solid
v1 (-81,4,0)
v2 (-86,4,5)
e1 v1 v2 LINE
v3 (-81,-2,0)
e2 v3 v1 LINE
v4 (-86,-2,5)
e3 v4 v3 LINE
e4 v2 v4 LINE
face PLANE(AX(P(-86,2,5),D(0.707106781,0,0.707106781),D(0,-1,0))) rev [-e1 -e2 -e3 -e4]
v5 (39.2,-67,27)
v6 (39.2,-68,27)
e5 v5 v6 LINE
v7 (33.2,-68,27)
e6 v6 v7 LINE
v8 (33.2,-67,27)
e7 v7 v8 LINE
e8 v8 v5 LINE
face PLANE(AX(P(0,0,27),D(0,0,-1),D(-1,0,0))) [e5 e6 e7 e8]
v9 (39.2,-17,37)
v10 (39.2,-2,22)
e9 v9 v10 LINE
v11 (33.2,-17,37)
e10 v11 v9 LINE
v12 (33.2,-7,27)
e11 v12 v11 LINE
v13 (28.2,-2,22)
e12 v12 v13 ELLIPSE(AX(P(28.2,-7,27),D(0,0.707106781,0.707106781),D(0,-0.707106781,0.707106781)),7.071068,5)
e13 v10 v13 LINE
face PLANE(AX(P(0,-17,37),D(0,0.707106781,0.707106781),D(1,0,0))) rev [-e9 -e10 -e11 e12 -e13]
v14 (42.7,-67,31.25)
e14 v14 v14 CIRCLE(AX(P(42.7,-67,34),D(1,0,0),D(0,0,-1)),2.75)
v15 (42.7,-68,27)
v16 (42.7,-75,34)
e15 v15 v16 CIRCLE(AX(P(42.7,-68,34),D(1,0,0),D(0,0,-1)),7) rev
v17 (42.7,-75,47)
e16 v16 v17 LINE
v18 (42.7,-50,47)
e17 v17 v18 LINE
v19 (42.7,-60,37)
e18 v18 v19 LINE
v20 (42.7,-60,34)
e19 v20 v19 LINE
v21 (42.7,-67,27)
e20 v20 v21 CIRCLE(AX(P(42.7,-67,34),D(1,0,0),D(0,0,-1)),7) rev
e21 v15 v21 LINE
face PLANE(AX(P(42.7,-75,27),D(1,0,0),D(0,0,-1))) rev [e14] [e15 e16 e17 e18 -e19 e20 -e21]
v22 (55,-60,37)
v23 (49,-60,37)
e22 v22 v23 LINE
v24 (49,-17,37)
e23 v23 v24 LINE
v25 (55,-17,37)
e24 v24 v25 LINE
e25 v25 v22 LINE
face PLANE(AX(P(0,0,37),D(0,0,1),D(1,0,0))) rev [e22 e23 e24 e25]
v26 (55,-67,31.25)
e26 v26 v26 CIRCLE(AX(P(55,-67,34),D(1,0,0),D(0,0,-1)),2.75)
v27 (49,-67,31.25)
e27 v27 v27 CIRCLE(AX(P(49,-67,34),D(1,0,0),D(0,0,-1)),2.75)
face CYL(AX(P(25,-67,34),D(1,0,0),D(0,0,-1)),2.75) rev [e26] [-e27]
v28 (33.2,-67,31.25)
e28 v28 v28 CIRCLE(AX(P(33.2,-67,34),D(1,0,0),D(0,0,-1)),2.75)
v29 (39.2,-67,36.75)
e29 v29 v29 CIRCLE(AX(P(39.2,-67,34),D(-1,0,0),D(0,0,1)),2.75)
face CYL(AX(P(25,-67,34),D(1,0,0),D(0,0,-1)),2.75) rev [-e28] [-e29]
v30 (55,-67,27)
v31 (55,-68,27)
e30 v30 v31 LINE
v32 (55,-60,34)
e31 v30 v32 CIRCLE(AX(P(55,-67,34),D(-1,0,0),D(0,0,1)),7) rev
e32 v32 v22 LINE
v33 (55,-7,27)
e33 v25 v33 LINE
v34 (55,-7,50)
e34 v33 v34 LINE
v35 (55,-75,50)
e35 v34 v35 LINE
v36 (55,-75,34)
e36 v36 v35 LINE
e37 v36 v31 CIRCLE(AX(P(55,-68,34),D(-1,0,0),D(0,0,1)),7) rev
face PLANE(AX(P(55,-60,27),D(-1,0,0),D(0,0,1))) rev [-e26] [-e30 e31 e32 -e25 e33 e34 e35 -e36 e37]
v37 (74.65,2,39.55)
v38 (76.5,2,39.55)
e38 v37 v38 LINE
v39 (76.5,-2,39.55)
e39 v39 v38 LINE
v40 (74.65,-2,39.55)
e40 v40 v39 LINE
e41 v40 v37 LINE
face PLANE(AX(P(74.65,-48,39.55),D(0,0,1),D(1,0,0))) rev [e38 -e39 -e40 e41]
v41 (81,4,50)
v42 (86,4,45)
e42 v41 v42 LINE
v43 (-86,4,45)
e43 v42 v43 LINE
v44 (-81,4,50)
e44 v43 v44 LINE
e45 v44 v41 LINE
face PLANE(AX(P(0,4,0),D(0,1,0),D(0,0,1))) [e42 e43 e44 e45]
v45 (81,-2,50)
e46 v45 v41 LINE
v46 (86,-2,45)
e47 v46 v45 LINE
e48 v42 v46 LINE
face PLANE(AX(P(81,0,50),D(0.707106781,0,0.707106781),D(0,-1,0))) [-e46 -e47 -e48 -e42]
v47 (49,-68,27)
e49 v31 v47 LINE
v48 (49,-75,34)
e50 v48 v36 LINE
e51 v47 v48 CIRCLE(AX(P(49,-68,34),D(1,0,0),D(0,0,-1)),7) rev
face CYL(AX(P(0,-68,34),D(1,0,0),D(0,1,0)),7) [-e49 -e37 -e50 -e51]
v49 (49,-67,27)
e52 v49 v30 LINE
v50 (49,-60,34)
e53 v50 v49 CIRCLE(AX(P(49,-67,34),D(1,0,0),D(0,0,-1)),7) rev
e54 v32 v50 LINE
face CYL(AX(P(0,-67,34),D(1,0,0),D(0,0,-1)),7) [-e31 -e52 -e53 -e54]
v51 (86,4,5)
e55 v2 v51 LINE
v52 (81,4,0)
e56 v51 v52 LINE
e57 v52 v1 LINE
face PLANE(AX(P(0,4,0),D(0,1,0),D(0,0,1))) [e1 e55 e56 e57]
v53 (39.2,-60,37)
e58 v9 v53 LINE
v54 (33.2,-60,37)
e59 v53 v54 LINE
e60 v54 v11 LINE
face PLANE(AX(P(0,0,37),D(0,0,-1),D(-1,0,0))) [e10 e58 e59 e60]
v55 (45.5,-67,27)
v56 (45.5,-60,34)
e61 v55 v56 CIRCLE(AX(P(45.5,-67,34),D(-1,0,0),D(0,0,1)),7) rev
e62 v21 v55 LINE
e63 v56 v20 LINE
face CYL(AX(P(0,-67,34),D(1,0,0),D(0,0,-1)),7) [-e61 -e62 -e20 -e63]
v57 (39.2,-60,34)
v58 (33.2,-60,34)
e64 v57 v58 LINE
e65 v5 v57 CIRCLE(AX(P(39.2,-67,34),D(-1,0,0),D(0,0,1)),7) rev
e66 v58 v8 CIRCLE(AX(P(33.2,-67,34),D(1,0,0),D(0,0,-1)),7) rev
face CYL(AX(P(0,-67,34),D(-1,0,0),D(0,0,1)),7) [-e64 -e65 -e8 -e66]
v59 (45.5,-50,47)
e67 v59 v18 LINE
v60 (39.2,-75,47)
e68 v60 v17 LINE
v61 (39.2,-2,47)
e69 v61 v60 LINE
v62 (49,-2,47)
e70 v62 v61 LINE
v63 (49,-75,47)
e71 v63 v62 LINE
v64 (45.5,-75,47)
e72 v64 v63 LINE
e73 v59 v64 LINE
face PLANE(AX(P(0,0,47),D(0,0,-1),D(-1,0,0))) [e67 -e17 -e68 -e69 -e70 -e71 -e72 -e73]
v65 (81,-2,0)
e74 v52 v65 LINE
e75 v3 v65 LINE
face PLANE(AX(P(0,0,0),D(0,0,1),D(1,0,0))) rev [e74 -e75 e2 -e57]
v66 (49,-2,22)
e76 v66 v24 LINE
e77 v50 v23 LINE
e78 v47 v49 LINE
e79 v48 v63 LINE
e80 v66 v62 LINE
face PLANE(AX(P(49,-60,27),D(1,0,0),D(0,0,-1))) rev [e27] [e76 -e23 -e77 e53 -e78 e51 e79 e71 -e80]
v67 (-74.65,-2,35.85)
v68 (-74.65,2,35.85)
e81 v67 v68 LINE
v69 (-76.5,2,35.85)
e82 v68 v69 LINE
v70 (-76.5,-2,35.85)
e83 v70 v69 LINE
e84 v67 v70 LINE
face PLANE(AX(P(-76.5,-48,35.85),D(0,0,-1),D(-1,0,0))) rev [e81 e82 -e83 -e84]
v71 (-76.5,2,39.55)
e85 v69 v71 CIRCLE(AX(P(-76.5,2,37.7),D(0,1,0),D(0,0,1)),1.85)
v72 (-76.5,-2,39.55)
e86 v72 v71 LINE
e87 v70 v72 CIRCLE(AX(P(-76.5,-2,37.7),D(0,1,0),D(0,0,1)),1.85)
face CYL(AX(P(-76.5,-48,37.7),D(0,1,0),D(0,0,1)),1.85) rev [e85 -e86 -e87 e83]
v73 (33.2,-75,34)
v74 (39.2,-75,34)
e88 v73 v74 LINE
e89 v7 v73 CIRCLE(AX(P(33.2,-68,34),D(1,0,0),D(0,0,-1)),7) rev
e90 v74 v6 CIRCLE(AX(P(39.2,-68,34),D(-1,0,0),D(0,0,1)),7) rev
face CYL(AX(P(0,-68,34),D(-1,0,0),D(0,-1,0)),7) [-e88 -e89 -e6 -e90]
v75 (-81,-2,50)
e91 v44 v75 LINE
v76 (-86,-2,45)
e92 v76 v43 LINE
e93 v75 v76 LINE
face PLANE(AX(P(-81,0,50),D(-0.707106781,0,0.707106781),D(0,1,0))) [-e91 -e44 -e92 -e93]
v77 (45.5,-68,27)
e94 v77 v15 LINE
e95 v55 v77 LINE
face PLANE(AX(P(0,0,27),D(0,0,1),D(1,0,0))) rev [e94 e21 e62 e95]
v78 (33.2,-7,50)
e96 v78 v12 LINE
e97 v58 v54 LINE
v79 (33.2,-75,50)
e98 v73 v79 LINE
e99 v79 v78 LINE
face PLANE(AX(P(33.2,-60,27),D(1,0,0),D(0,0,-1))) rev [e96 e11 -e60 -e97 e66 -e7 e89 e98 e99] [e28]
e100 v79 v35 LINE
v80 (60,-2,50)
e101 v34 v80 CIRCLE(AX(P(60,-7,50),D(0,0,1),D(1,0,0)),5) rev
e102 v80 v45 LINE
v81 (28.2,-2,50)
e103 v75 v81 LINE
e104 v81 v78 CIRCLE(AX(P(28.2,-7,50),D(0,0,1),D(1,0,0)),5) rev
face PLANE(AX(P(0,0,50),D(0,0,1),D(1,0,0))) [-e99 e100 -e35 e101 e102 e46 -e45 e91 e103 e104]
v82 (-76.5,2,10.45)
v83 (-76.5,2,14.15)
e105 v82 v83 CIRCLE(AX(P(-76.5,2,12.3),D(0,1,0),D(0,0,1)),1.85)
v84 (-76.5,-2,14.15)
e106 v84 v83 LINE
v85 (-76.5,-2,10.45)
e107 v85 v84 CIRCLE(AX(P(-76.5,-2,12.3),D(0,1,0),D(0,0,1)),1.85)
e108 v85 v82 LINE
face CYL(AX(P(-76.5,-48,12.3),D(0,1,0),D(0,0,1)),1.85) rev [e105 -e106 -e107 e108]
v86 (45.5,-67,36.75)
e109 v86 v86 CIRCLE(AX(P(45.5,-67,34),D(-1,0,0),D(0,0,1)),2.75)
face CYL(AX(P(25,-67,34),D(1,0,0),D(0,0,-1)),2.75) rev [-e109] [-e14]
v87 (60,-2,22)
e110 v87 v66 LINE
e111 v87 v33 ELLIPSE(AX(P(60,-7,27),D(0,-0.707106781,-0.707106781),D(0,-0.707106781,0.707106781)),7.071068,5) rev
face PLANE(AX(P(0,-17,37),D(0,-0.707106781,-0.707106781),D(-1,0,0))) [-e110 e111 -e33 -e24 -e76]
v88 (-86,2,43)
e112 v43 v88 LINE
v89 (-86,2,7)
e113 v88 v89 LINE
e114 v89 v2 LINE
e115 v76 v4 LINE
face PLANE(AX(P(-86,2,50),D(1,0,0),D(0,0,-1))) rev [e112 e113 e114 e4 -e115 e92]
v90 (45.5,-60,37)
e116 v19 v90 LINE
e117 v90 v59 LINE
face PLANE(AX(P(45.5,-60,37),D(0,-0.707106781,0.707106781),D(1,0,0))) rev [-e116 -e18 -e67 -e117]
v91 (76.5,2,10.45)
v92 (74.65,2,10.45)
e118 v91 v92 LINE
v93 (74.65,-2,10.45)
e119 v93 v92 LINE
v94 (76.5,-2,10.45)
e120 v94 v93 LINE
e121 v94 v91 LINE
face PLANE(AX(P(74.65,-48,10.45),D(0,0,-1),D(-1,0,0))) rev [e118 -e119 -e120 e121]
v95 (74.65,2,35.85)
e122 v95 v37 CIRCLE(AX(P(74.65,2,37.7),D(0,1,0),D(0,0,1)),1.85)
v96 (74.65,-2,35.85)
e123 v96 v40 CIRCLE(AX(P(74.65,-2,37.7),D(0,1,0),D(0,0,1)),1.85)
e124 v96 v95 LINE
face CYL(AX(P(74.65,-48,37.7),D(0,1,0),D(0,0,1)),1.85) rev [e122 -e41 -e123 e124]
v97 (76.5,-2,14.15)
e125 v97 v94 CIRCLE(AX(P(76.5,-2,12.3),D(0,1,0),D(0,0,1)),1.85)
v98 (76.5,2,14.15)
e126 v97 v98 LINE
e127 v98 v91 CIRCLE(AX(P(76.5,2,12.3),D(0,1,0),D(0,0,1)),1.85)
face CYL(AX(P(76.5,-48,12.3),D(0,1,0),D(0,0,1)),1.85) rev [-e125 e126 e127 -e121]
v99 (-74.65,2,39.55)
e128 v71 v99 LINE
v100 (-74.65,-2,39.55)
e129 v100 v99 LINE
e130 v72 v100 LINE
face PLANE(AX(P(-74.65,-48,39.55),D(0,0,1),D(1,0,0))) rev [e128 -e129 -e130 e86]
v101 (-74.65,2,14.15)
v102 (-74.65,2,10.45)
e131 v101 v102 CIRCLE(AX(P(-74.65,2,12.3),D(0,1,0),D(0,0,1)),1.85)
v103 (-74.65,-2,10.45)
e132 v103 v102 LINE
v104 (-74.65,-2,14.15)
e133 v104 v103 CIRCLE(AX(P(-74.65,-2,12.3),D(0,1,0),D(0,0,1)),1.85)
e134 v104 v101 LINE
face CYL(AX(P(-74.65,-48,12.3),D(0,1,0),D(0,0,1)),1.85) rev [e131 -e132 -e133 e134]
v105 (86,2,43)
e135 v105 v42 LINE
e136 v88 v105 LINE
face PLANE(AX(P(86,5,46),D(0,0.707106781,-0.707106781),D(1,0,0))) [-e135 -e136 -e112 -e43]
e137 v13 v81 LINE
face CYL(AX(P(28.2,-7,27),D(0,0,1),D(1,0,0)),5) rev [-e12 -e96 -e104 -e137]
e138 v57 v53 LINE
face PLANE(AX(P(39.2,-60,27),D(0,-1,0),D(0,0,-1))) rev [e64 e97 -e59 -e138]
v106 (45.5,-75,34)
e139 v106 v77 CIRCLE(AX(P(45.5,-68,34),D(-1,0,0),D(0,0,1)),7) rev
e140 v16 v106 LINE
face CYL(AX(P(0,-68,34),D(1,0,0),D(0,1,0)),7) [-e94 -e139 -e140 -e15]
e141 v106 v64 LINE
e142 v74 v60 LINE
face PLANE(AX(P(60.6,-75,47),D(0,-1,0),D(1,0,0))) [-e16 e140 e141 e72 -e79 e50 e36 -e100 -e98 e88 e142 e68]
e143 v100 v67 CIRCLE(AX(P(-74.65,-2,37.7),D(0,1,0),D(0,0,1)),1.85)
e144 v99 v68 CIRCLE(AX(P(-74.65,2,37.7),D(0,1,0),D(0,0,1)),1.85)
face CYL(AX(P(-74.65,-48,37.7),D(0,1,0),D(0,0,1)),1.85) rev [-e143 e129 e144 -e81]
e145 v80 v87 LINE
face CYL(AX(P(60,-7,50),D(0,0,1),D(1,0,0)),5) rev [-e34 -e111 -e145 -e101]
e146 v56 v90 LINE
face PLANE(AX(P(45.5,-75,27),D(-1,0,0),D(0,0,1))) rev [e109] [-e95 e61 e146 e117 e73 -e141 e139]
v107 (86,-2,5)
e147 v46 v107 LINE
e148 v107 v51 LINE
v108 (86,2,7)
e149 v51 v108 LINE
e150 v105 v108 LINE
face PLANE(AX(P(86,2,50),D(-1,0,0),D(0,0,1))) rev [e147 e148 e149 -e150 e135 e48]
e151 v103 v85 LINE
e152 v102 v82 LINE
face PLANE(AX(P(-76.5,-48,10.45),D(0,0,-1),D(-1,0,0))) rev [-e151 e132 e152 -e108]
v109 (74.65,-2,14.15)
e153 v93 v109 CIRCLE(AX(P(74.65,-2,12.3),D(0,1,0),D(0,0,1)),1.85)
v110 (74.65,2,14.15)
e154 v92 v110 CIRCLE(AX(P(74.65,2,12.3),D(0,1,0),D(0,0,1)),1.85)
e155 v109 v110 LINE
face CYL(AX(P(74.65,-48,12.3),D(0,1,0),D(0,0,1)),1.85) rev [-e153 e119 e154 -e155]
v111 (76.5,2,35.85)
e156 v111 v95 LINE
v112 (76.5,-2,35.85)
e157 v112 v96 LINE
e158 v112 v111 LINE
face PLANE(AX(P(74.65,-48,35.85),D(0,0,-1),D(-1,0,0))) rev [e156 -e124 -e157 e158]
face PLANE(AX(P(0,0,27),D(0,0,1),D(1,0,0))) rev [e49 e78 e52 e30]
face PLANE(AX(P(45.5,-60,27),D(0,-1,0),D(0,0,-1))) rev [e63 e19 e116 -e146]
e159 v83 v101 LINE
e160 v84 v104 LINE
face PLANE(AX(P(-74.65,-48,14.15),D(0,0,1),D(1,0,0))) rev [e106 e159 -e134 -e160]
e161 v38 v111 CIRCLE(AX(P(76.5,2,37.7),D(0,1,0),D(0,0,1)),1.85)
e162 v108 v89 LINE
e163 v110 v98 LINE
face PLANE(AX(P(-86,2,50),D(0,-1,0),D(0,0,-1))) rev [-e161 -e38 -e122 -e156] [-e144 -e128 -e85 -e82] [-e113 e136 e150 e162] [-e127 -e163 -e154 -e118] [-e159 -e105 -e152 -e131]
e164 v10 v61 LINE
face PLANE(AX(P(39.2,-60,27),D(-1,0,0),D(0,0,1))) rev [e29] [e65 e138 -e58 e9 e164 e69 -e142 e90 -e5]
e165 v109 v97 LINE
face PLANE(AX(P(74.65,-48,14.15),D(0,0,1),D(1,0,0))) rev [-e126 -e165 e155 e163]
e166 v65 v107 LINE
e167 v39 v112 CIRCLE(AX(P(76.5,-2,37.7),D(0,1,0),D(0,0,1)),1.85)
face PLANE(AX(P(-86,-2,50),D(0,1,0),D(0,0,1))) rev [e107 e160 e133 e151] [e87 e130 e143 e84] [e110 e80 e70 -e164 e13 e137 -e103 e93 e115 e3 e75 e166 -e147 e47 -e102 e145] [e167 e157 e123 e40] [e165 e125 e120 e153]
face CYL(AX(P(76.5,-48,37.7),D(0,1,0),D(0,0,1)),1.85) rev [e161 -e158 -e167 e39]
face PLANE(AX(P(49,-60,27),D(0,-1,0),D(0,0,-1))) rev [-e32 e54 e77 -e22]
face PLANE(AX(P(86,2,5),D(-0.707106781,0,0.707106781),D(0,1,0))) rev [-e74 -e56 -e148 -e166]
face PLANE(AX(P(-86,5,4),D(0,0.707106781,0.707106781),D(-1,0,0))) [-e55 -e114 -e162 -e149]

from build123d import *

# Parameters (mm, degrees)
SKETCH1_W           = 172
SKETCH1_H           = 4
BOSS_EXTRUDE1_DEPTH = 50
CUT_EXTRUDE1_DEPTH  = 50
SKETCH3_W           = 35
SKETCH3_H           = 73
BOSS_EXTRUDE2_DEPTH = 3
SKETCH4_W           = 2.8
SKETCH4_H           = 15
SKETCH4_W_2         = 6
BOSS_EXTRUDE3_DEPTH = 20
FILLET1_R           = 7
SKETCH5_R           = 2.75
CUT_EXTRUDE2_DEPTH  = 30
SKETCH6_W           = 5.6
SKETCH6_H           = 73
SKETCH6_W_2         = 7.6
CUT_EXTRUDE3_DEPTH  = 20
SKETCH7_W           = 6
SKETCH7_H           = 58
BOSS_EXTRUDE4_DEPTH = 10
CHAMFER1_SIZE       = 10
CHAMFER2_SIZE       = 15
FILLET2_R           = 5
SKETCH8_W           = 172
SKETCH8_H           = 4
BOSS_EXTRUDE5_DEPTH = 2
CHAMFER3_SIZE       = 3
CHAMFER4_SIZE       = 5


with BuildPart() as part:
    # Sketch1 → Boss-Extrude1 (new body)
    with BuildSketch(Plane.XY):
        Rectangle(SKETCH1_W, SKETCH1_H)
    extrude(amount=BOSS_EXTRUDE1_DEPTH)

    # Sketch2 → Cut-Extrude1 (cut)
    with BuildSketch(Plane(origin=(0, 2, 0), x_dir=(1, 0, 0), z_dir=(0, 1, 0))):
        with BuildLine():
            Line((-76.5, -10.45), (-74.65, -10.45))
            ThreePointArc((-74.65, -10.45), (-72.8, -12.3), (-74.65, -14.15))
            Line((-74.65, -14.15), (-76.5, -14.15))
            ThreePointArc((-76.5, -14.15), (-78.35, -12.3), (-76.5, -10.45))
        make_face()
        with BuildLine():
            Line((74.65, -10.45), (76.5, -10.45))
            ThreePointArc((76.5, -10.45), (78.35, -12.3), (76.5, -14.15))
            Line((76.5, -14.15), (74.65, -14.15))
            ThreePointArc((74.65, -14.15), (72.8, -12.3), (74.65, -10.45))
        make_face()
        with BuildLine():
            Line((-76.5, -35.85), (-74.65, -35.85))
            ThreePointArc((-74.65, -35.85), (-72.8, -37.7), (-74.65, -39.55))
            Line((-74.65, -39.55), (-76.5, -39.55))
            ThreePointArc((-76.5, -39.55), (-78.35, -37.7), (-76.5, -35.85))
        make_face()
        with BuildLine():
            Line((74.65, -35.85), (76.5, -35.85))
            ThreePointArc((76.5, -35.85), (78.35, -37.7), (76.5, -39.55))
            Line((76.5, -39.55), (74.65, -39.55))
            ThreePointArc((74.65, -39.55), (72.8, -37.7), (74.65, -35.85))
        make_face()
    extrude(amount=-CUT_EXTRUDE1_DEPTH, mode=Mode.SUBTRACT)

    # Sketch3 → Boss-Extrude2 (add)
    with BuildSketch(Plane.XY.offset(50)):
        with Locations((43.1, -38.5)):
            Rectangle(SKETCH3_W, SKETCH3_H)
    extrude(amount=-BOSS_EXTRUDE2_DEPTH)

    # Sketch4 → Boss-Extrude3 (add)
    with BuildSketch(Plane(origin=(0, 0, 47), x_dir=(-1, 0, 0), z_dir=(0, 0, -1))):
        with Locations((-44.1, -67.5)):
            Rectangle(SKETCH4_W, SKETCH4_H)
        with Locations((-36.2, -67.5)):
            Rectangle(SKETCH4_W_2, SKETCH4_H)
        with Locations((-52, -67.5)):
            Rectangle(SKETCH4_W_2, SKETCH4_H)
    extrude(amount=BOSS_EXTRUDE3_DEPTH)

    # Fillet1
    fillet1_edges = [part.edges().sort_by_distance(p)[0] for p in [
        (44.1, -75, 27),
        (44.1, -60, 27),
        (36.2, -75, 27),
        (36.2, -60, 27),
        (52, -60, 27),
        (52, -75, 27),
    ]]
    fillet(fillet1_edges, radius=FILLET1_R)

    # Sketch5 → Cut-Extrude2 (cut)
    with BuildSketch(Plane(origin=(55, 0, 0), x_dir=(0, 0, -1), z_dir=(1, 0, 0))):
        with Locations((-34, -67)):
            Circle(SKETCH5_R)
    extrude(amount=-CUT_EXTRUDE2_DEPTH, mode=Mode.SUBTRACT)

    # Sketch6 → Cut-Extrude3 (cut)
    with BuildSketch(Plane(origin=(0, 0, 47), x_dir=(-1, 0, 0), z_dir=(0, 0, -1))):
        with Locations((-57.8, -38.5)):
            Rectangle(SKETCH6_W, SKETCH6_H)
        with Locations((-29.4, -38.5)):
            Rectangle(SKETCH6_W_2, SKETCH6_H)
    extrude(amount=-CUT_EXTRUDE3_DEPTH, mode=Mode.SUBTRACT)

    # Sketch7 → Boss-Extrude4 (add)
    with BuildSketch(Plane(origin=(0, 0, 47), x_dir=(-1, 0, 0), z_dir=(0, 0, -1))):
        with Locations((-52, -31)):
            Rectangle(SKETCH7_W, SKETCH7_H)
        with Locations((-36.2, -31)):
            Rectangle(SKETCH7_W, SKETCH7_H)
    extrude(amount=BOSS_EXTRUDE4_DEPTH)

    # Chamfer1
    chamfer1_edges = [part.edges().sort_by_distance(p)[0] for p in [
        (44.1, -60, 47),
    ]]
    chamfer(chamfer1_edges, length=CHAMFER1_SIZE)

    # Chamfer2
    chamfer2_edges = [part.edges().sort_by_distance(p)[0] for p in [
        (52, -2, 37),
        (36.2, -2, 37),
    ]]
    chamfer(chamfer2_edges, length=CHAMFER2_SIZE)

    # Fillet2
    fillet2_edges = [part.edges().sort_by_distance(p)[0] for p in [
        (55, -2, 36),
        (33.2, -2, 36),
    ]]
    fillet(fillet2_edges, radius=FILLET2_R)

    # Sketch8 → Boss-Extrude5 (add)
    with BuildSketch(Plane(origin=(0, 2, 0), x_dir=(1, 0, 0), z_dir=(0, 1, 0))):
        with Locations((0, -2)):
            Rectangle(SKETCH8_W, SKETCH8_H)
        with Locations((0, -48)):
            Rectangle(SKETCH8_W, SKETCH8_H)
    extrude(amount=BOSS_EXTRUDE5_DEPTH)

    # Chamfer3
    # the kernel refuses this chamfer: 3 mm, written as the material it adds along each edge
    with BuildSketch(Plane(origin=(-86, 2, 46), x_dir=(0, -0.027495876610586334, -0.9996219169112968), z_dir=(1, 0, 0))) as chamfer3_piece_1_section:
        Polygon((CHAMFER3_SIZE * 0.999621916911, CHAMFER3_SIZE * 0.0274958766106), (-CHAMFER3_SIZE * 0.0274958766106, CHAMFER3_SIZE * 0.999621916911), (0, 0), align=None)
    chamfer3_piece_1 = extrude(amount=172, mode=Mode.PRIVATE)
    chamfer3_piece_1 = split(chamfer3_piece_1, bisect_by=Plane(origin=(0, 4, 44.907908995), z_dir=(0, -1, 0)), keep=Keep.TOP, mode=Mode.PRIVATE)
    add(chamfer3_piece_1)
    with BuildSketch(Plane(origin=(86, 2, 4), x_dir=(0, -0.02749587661058634, 0.9996219169112968), z_dir=(-1, 0, 0))) as chamfer3_piece_2_section:
        Polygon((CHAMFER3_SIZE * 0.999621916911, CHAMFER3_SIZE * 0.0274958766106), (-CHAMFER3_SIZE * 0.0274958766106, CHAMFER3_SIZE * 0.999621916911), (0, 0), align=None)
    chamfer3_piece_2 = extrude(amount=172, mode=Mode.PRIVATE)
    chamfer3_piece_2 = split(chamfer3_piece_2, bisect_by=Plane(origin=(0, 4, 5.092091005), z_dir=(0, -1, 0)), keep=Keep.TOP, mode=Mode.PRIVATE)
    add(chamfer3_piece_2)

    # Chamfer4
    chamfer4_edges = [part.edges().sort_by_distance(p)[0] for p in [
        (-86, 1, 0),
        (-86, 1, 50),
        (86, 1, 50),
        (86, 1, 0),
    ]]
    chamfer(chamfer4_edges, length=CHAMFER4_SIZE)


solid = part.part
